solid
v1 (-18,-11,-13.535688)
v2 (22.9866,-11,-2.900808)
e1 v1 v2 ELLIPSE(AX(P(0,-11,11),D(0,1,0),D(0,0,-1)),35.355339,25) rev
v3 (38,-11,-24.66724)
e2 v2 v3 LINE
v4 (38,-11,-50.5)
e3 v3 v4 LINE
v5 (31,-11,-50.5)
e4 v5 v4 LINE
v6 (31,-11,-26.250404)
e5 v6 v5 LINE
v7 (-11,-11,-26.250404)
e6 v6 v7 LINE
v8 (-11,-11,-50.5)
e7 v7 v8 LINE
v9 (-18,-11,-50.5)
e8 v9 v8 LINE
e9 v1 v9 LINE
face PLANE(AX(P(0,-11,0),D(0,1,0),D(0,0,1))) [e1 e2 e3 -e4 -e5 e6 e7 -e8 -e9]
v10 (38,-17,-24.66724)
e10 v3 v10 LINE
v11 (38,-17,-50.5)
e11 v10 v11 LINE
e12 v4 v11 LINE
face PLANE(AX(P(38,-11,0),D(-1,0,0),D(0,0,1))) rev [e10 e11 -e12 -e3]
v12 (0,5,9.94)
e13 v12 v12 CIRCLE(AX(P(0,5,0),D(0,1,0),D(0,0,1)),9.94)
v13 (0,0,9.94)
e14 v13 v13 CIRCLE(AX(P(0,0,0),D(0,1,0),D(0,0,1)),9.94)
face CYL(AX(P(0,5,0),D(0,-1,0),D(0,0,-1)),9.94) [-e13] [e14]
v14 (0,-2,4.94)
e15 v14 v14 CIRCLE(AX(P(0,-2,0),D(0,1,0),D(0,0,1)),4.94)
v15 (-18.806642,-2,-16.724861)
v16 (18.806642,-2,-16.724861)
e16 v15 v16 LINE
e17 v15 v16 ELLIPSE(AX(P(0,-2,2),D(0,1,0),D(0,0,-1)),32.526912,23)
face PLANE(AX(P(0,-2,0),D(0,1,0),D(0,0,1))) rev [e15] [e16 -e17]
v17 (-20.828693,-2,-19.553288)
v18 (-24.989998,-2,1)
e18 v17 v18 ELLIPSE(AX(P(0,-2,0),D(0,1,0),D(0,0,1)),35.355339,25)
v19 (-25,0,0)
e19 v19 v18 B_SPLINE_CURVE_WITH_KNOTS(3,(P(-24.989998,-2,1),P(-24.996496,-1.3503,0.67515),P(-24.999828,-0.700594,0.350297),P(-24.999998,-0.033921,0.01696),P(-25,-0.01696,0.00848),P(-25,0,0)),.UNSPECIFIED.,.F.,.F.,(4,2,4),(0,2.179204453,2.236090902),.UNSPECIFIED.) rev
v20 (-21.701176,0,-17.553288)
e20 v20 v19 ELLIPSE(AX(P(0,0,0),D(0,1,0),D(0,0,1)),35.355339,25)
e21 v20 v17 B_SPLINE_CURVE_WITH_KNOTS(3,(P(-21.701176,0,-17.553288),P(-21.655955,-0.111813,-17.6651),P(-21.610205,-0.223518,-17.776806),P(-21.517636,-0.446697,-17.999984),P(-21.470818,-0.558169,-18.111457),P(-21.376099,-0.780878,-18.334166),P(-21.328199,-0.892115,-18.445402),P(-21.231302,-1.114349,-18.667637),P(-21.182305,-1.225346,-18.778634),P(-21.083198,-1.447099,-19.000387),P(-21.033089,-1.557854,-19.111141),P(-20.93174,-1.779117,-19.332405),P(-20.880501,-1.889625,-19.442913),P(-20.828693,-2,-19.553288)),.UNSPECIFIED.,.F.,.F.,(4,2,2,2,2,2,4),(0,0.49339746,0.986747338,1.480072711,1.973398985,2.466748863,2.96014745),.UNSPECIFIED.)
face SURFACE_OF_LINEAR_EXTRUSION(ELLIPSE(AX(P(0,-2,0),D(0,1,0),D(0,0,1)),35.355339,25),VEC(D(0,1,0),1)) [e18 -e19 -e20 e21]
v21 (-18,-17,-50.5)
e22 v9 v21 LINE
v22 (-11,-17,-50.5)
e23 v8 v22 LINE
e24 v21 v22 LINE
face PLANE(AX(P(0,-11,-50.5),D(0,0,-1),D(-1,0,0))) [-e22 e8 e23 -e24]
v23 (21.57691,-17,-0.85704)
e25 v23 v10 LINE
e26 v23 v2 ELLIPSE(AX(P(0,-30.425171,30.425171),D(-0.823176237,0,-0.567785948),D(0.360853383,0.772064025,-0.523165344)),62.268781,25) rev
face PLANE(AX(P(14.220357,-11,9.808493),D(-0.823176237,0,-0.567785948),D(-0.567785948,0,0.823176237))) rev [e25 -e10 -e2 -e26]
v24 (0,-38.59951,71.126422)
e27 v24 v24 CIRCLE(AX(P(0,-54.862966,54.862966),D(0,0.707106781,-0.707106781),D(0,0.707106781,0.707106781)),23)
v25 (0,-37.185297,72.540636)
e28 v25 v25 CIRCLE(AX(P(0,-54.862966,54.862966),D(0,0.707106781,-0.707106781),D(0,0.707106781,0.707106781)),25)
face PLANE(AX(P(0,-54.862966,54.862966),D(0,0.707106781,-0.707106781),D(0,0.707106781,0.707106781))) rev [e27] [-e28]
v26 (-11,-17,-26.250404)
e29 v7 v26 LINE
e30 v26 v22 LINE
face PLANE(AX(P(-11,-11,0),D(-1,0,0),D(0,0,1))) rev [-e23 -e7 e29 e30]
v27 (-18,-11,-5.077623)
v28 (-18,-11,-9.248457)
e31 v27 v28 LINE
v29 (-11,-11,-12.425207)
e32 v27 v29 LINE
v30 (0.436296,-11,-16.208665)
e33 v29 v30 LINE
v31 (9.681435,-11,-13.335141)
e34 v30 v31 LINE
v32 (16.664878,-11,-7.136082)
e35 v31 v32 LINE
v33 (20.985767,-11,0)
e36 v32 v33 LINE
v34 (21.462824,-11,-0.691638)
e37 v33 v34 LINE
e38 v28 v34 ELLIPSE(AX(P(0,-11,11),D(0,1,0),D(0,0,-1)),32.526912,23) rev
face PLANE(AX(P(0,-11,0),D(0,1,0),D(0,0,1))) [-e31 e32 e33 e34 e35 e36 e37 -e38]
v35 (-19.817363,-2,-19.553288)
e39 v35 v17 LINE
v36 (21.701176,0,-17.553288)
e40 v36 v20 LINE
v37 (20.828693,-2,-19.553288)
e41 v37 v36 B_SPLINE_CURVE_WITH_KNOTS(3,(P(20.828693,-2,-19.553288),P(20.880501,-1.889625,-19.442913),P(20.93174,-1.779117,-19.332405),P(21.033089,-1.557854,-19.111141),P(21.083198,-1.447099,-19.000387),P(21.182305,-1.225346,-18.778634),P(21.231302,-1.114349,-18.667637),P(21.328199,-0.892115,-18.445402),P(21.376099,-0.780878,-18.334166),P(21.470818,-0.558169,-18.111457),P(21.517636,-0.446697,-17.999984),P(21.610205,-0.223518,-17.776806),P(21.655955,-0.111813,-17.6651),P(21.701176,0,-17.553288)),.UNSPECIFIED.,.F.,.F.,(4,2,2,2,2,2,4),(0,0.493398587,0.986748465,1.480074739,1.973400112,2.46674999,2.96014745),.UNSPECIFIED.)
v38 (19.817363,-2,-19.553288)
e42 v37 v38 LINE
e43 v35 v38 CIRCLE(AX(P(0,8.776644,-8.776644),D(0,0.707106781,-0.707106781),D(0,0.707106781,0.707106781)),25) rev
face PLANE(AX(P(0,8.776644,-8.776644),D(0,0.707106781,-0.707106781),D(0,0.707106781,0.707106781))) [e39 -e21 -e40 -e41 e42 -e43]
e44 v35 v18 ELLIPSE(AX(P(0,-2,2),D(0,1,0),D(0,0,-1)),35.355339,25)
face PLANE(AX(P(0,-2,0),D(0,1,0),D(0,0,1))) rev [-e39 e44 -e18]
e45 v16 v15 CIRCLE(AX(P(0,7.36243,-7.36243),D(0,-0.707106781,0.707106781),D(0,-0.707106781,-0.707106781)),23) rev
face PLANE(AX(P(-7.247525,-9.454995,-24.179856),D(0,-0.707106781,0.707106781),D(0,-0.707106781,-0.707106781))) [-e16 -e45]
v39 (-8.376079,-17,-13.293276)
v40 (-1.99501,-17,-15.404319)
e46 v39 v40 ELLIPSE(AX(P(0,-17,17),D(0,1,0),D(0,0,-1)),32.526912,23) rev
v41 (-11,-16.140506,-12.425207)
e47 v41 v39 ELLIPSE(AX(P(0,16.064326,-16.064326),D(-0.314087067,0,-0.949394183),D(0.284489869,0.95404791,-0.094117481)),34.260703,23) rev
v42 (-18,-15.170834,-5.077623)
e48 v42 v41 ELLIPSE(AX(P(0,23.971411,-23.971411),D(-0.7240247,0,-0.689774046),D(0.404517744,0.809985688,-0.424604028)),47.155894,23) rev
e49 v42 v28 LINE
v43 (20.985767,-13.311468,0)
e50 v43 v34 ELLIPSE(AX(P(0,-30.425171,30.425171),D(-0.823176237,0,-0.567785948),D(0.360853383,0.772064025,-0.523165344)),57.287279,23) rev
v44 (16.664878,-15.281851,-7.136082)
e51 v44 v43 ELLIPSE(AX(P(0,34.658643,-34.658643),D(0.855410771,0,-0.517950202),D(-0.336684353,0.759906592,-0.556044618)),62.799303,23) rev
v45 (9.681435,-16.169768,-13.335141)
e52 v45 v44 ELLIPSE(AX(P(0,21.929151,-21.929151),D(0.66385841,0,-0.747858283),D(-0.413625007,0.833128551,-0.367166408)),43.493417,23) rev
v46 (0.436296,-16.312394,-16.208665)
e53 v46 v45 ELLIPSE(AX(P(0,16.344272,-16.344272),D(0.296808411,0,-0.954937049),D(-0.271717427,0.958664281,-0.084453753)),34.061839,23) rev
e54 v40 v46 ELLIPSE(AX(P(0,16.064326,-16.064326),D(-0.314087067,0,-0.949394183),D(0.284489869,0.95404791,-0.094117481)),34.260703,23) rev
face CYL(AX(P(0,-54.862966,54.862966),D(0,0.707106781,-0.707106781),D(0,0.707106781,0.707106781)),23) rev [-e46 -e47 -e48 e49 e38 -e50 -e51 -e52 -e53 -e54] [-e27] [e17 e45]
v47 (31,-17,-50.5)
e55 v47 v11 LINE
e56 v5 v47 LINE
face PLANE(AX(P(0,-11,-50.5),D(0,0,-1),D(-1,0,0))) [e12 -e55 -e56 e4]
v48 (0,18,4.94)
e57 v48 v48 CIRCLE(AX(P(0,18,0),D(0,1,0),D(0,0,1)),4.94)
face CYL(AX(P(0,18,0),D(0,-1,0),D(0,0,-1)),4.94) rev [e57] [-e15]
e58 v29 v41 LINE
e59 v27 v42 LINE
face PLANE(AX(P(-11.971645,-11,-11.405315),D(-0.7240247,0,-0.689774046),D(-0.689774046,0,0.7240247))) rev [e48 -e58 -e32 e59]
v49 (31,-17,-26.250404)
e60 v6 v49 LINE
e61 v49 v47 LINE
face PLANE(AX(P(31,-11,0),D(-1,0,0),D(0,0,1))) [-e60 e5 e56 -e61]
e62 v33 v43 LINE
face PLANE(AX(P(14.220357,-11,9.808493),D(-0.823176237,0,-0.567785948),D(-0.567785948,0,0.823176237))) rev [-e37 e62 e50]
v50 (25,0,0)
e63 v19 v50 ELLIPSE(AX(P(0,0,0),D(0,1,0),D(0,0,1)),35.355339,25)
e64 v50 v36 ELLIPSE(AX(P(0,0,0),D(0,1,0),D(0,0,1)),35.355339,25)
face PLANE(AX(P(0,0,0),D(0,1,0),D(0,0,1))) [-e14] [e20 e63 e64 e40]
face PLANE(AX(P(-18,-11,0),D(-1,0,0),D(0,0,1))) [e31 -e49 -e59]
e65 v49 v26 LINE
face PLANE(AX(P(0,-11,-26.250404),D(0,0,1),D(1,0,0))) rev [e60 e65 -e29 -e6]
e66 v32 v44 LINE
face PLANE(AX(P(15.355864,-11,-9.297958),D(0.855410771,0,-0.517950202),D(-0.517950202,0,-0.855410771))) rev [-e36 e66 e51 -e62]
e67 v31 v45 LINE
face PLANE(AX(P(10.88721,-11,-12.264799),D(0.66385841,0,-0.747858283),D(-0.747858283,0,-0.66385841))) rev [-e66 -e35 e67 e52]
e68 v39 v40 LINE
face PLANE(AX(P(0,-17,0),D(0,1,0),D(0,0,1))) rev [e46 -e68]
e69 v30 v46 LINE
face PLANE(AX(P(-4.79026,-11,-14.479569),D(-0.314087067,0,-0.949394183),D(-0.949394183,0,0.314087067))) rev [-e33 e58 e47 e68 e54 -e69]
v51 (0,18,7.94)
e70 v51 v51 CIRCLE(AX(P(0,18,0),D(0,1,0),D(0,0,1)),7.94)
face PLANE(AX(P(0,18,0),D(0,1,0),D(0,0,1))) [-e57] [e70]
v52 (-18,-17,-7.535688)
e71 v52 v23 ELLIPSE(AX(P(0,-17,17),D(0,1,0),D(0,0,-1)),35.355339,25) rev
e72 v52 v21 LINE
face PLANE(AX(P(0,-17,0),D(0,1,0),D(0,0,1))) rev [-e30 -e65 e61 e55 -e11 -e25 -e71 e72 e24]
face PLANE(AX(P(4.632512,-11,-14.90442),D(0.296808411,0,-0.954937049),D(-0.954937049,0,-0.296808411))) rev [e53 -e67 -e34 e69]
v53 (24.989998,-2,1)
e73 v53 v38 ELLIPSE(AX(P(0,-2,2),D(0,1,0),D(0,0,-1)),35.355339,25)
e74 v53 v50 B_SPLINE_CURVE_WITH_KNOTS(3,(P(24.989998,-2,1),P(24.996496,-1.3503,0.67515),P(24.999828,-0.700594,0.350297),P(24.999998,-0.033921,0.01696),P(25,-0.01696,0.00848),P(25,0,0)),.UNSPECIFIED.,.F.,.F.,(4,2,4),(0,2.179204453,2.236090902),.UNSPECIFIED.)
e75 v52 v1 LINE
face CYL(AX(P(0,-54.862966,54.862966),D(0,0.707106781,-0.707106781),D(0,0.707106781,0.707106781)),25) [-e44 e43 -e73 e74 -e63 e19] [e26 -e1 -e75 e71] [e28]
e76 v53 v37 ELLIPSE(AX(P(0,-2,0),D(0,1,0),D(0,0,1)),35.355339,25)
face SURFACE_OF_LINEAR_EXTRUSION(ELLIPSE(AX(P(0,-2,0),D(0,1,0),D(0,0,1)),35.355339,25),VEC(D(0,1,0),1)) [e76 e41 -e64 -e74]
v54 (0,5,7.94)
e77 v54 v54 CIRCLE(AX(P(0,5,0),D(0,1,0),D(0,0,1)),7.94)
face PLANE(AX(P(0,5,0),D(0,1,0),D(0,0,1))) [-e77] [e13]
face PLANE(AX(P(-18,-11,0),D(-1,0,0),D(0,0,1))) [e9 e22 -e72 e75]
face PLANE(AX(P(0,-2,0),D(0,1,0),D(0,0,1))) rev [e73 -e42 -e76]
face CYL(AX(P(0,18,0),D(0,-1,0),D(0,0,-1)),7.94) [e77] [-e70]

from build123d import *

# Parameters (mm, degrees)
SKETCH1_R                 = 9.94
SKETCH1_R_2               = 7.94
BOSS_EXTRUDE3_DEPTH       = 5
SKETCH1_6_R               = 7.94
SKETCH1_6_R_2             = 4.94
BOSS_EXTRUDE4_DEPTH       = 18
BOSS_EXTRUDE7_DEPTH       = 40
BOSS_EXTRUDE7_DEPTH_BACK  = 70
SKETCH4_R                 = 25
SKETCH4_R_2               = 23
SKETCH7_W                 = 197.712308018
SKETCH7_H                 = 113.854833504
CUT_EXTRUDE4_DEPTH        = 64
BOSS_EXTRUDE9_START       = -2
SKETCH9_RX                = 35.355339059
SKETCH9_RY                = 25
SKETCH9_R                 = 4.94
BOSS_EXTRUDE9_DEPTH       = 2
SKETCH13_W                = 94.503894001
SKETCH13_H                = 33.113273172
CUT_EXTRUDE7_DEPTH        = 32
BOSS_EXTRUDE11_START      = -2
BOSS_EXTRUDE11_DEPTH      = 2
BOSS_EXTRUDE12_DEPTH      = 2
BOSS_EXTRUDE12_DEPTH_BACK = 4


with BuildPart() as part:
    # Sketch1 → Boss-Extrude3 (new body)
    with BuildSketch(Plane(origin=(0, 0, 0), x_dir=(1, 0, 0), z_dir=(0, 1, 0))):
        with Locations(Location((0, 0, 0), (0, 0, 270))):
            Circle(SKETCH1_R)
        with Locations(Location((0, 0, 0), (0, 0, 270))):
            Circle(SKETCH1_R_2, mode=Mode.SUBTRACT)
    extrude(amount=BOSS_EXTRUDE3_DEPTH)

    # Sketch1<6> → Boss-Extrude4 (add)
    with BuildSketch(Plane(origin=(0, 0, 0), x_dir=(1, 0, 0), z_dir=(0, 1, 0))):
        with Locations(Location((0, 0, 0), (0, 0, 270))):
            Circle(SKETCH1_6_R)
        with Locations(Location((0, 0, 0), (0, 0, 270))):
            Circle(SKETCH1_6_R_2, mode=Mode.SUBTRACT)
    extrude(amount=BOSS_EXTRUDE4_DEPTH)



with BuildPart() as body_2:
    # Sketch4 → Boss-Extrude7 (new, two sides: drawn at the far end of the back side and taken through both)
    with BuildSketch(Plane(origin=(0, -5.365491749, 5.365491749), x_dir=(-1, 0, 0), z_dir=(0, 0.7071067811865458, -0.7071067811865492)).offset(-BOSS_EXTRUDE7_DEPTH_BACK)):
        with Locations(Location((0, 0, 0), (0, 0, 90))):
            Circle(SKETCH4_R)
        with Locations(Location((0, 0, 0), (0, 0, 90))):
            Circle(SKETCH4_R_2, mode=Mode.SUBTRACT)
    extrude(amount=BOSS_EXTRUDE7_DEPTH + BOSS_EXTRUDE7_DEPTH_BACK)

    # Sketch7 → Cut-Extrude4 (cut)
    with BuildSketch(Plane(origin=(0, 0, 0), x_dir=(1, 0, 0), z_dir=(0, 1, 0))):
        Rectangle(SKETCH7_W, SKETCH7_H)
    extrude(amount=CUT_EXTRUDE4_DEPTH, mode=Mode.SUBTRACT)


with BuildPart() as part_1:
    add(part.part)

    add(body_2.part)  # Boss-Extrude9 merges body 2
    # Sketch9 → Boss-Extrude9 (add)
    with BuildSketch(Plane(origin=(0, 0, 0), x_dir=(1, 0, 0), z_dir=(0, 1, 0)).offset(BOSS_EXTRUDE9_START)):
        with Locations(Location((0, 0), (0, 0, -90))):
            Ellipse(SKETCH9_RX, SKETCH9_RY)
        with Locations(Location((0, 0, 0), (0, 0, 270))):
            Circle(SKETCH9_R, mode=Mode.SUBTRACT)
    extrude(amount=BOSS_EXTRUDE9_DEPTH)

    # Sketch13 → Cut-Extrude7 (cut)
    with BuildSketch(Plane(origin=(0, 8.776643875, -8.776643875), x_dir=(-1, 0, 0), z_dir=(0, 0.7071067811865458, -0.7071067811865492))):
        with Locations((18.042265065, -27.160500048)):
            Rectangle(SKETCH13_W, SKETCH13_H)
    extrude(amount=CUT_EXTRUDE7_DEPTH, mode=Mode.SUBTRACT)

    # Boss-Extrude11: read off the stored shape, not the designer's step
    # Boss-Extrude11 outline → Boss-Extrude11 (add)
    with BuildSketch(Plane(origin=(0, 8.776643875, -8.776643875), x_dir=(-1, 0, 0), z_dir=(0, 0.7071067811865458, -0.7071067811865492)).offset(BOSS_EXTRUDE11_START)):
        with BuildLine():
            Line((18.806642372, -13.240475924), (-18.806642372, -13.240475924))
            ThreePointArc((-18.806642372, -13.240475924), (0, -23), (18.806642372, -13.240475924))
        make_face()
    extrude(amount=BOSS_EXTRUDE11_DEPTH)

    # Sketch15 → Boss-Extrude12 (add, two sides: drawn at the far end of the back side and taken through both)
    with BuildSketch(Plane(origin=(0, -13, 0), x_dir=(1, 0, 0), z_dir=(0, 1, 0)).offset(-BOSS_EXTRUDE12_DEPTH_BACK)):
        Polygon((-18, 50.5), (-18, 5.077623205), (-11, 12.425207431), (0.436295729, 16.20866498), (9.681434559, 13.33514052), (16.664877802, 7.136081647), (20.985766733, 0), (38, 24.667240496), (38, 50.5), (31, 50.5), (31, 26.250403727), (-11, 26.250403727), (-11, 50.5), align=None)
    extrude(amount=BOSS_EXTRUDE12_DEPTH + BOSS_EXTRUDE12_DEPTH_BACK)


solid = part_1.part
